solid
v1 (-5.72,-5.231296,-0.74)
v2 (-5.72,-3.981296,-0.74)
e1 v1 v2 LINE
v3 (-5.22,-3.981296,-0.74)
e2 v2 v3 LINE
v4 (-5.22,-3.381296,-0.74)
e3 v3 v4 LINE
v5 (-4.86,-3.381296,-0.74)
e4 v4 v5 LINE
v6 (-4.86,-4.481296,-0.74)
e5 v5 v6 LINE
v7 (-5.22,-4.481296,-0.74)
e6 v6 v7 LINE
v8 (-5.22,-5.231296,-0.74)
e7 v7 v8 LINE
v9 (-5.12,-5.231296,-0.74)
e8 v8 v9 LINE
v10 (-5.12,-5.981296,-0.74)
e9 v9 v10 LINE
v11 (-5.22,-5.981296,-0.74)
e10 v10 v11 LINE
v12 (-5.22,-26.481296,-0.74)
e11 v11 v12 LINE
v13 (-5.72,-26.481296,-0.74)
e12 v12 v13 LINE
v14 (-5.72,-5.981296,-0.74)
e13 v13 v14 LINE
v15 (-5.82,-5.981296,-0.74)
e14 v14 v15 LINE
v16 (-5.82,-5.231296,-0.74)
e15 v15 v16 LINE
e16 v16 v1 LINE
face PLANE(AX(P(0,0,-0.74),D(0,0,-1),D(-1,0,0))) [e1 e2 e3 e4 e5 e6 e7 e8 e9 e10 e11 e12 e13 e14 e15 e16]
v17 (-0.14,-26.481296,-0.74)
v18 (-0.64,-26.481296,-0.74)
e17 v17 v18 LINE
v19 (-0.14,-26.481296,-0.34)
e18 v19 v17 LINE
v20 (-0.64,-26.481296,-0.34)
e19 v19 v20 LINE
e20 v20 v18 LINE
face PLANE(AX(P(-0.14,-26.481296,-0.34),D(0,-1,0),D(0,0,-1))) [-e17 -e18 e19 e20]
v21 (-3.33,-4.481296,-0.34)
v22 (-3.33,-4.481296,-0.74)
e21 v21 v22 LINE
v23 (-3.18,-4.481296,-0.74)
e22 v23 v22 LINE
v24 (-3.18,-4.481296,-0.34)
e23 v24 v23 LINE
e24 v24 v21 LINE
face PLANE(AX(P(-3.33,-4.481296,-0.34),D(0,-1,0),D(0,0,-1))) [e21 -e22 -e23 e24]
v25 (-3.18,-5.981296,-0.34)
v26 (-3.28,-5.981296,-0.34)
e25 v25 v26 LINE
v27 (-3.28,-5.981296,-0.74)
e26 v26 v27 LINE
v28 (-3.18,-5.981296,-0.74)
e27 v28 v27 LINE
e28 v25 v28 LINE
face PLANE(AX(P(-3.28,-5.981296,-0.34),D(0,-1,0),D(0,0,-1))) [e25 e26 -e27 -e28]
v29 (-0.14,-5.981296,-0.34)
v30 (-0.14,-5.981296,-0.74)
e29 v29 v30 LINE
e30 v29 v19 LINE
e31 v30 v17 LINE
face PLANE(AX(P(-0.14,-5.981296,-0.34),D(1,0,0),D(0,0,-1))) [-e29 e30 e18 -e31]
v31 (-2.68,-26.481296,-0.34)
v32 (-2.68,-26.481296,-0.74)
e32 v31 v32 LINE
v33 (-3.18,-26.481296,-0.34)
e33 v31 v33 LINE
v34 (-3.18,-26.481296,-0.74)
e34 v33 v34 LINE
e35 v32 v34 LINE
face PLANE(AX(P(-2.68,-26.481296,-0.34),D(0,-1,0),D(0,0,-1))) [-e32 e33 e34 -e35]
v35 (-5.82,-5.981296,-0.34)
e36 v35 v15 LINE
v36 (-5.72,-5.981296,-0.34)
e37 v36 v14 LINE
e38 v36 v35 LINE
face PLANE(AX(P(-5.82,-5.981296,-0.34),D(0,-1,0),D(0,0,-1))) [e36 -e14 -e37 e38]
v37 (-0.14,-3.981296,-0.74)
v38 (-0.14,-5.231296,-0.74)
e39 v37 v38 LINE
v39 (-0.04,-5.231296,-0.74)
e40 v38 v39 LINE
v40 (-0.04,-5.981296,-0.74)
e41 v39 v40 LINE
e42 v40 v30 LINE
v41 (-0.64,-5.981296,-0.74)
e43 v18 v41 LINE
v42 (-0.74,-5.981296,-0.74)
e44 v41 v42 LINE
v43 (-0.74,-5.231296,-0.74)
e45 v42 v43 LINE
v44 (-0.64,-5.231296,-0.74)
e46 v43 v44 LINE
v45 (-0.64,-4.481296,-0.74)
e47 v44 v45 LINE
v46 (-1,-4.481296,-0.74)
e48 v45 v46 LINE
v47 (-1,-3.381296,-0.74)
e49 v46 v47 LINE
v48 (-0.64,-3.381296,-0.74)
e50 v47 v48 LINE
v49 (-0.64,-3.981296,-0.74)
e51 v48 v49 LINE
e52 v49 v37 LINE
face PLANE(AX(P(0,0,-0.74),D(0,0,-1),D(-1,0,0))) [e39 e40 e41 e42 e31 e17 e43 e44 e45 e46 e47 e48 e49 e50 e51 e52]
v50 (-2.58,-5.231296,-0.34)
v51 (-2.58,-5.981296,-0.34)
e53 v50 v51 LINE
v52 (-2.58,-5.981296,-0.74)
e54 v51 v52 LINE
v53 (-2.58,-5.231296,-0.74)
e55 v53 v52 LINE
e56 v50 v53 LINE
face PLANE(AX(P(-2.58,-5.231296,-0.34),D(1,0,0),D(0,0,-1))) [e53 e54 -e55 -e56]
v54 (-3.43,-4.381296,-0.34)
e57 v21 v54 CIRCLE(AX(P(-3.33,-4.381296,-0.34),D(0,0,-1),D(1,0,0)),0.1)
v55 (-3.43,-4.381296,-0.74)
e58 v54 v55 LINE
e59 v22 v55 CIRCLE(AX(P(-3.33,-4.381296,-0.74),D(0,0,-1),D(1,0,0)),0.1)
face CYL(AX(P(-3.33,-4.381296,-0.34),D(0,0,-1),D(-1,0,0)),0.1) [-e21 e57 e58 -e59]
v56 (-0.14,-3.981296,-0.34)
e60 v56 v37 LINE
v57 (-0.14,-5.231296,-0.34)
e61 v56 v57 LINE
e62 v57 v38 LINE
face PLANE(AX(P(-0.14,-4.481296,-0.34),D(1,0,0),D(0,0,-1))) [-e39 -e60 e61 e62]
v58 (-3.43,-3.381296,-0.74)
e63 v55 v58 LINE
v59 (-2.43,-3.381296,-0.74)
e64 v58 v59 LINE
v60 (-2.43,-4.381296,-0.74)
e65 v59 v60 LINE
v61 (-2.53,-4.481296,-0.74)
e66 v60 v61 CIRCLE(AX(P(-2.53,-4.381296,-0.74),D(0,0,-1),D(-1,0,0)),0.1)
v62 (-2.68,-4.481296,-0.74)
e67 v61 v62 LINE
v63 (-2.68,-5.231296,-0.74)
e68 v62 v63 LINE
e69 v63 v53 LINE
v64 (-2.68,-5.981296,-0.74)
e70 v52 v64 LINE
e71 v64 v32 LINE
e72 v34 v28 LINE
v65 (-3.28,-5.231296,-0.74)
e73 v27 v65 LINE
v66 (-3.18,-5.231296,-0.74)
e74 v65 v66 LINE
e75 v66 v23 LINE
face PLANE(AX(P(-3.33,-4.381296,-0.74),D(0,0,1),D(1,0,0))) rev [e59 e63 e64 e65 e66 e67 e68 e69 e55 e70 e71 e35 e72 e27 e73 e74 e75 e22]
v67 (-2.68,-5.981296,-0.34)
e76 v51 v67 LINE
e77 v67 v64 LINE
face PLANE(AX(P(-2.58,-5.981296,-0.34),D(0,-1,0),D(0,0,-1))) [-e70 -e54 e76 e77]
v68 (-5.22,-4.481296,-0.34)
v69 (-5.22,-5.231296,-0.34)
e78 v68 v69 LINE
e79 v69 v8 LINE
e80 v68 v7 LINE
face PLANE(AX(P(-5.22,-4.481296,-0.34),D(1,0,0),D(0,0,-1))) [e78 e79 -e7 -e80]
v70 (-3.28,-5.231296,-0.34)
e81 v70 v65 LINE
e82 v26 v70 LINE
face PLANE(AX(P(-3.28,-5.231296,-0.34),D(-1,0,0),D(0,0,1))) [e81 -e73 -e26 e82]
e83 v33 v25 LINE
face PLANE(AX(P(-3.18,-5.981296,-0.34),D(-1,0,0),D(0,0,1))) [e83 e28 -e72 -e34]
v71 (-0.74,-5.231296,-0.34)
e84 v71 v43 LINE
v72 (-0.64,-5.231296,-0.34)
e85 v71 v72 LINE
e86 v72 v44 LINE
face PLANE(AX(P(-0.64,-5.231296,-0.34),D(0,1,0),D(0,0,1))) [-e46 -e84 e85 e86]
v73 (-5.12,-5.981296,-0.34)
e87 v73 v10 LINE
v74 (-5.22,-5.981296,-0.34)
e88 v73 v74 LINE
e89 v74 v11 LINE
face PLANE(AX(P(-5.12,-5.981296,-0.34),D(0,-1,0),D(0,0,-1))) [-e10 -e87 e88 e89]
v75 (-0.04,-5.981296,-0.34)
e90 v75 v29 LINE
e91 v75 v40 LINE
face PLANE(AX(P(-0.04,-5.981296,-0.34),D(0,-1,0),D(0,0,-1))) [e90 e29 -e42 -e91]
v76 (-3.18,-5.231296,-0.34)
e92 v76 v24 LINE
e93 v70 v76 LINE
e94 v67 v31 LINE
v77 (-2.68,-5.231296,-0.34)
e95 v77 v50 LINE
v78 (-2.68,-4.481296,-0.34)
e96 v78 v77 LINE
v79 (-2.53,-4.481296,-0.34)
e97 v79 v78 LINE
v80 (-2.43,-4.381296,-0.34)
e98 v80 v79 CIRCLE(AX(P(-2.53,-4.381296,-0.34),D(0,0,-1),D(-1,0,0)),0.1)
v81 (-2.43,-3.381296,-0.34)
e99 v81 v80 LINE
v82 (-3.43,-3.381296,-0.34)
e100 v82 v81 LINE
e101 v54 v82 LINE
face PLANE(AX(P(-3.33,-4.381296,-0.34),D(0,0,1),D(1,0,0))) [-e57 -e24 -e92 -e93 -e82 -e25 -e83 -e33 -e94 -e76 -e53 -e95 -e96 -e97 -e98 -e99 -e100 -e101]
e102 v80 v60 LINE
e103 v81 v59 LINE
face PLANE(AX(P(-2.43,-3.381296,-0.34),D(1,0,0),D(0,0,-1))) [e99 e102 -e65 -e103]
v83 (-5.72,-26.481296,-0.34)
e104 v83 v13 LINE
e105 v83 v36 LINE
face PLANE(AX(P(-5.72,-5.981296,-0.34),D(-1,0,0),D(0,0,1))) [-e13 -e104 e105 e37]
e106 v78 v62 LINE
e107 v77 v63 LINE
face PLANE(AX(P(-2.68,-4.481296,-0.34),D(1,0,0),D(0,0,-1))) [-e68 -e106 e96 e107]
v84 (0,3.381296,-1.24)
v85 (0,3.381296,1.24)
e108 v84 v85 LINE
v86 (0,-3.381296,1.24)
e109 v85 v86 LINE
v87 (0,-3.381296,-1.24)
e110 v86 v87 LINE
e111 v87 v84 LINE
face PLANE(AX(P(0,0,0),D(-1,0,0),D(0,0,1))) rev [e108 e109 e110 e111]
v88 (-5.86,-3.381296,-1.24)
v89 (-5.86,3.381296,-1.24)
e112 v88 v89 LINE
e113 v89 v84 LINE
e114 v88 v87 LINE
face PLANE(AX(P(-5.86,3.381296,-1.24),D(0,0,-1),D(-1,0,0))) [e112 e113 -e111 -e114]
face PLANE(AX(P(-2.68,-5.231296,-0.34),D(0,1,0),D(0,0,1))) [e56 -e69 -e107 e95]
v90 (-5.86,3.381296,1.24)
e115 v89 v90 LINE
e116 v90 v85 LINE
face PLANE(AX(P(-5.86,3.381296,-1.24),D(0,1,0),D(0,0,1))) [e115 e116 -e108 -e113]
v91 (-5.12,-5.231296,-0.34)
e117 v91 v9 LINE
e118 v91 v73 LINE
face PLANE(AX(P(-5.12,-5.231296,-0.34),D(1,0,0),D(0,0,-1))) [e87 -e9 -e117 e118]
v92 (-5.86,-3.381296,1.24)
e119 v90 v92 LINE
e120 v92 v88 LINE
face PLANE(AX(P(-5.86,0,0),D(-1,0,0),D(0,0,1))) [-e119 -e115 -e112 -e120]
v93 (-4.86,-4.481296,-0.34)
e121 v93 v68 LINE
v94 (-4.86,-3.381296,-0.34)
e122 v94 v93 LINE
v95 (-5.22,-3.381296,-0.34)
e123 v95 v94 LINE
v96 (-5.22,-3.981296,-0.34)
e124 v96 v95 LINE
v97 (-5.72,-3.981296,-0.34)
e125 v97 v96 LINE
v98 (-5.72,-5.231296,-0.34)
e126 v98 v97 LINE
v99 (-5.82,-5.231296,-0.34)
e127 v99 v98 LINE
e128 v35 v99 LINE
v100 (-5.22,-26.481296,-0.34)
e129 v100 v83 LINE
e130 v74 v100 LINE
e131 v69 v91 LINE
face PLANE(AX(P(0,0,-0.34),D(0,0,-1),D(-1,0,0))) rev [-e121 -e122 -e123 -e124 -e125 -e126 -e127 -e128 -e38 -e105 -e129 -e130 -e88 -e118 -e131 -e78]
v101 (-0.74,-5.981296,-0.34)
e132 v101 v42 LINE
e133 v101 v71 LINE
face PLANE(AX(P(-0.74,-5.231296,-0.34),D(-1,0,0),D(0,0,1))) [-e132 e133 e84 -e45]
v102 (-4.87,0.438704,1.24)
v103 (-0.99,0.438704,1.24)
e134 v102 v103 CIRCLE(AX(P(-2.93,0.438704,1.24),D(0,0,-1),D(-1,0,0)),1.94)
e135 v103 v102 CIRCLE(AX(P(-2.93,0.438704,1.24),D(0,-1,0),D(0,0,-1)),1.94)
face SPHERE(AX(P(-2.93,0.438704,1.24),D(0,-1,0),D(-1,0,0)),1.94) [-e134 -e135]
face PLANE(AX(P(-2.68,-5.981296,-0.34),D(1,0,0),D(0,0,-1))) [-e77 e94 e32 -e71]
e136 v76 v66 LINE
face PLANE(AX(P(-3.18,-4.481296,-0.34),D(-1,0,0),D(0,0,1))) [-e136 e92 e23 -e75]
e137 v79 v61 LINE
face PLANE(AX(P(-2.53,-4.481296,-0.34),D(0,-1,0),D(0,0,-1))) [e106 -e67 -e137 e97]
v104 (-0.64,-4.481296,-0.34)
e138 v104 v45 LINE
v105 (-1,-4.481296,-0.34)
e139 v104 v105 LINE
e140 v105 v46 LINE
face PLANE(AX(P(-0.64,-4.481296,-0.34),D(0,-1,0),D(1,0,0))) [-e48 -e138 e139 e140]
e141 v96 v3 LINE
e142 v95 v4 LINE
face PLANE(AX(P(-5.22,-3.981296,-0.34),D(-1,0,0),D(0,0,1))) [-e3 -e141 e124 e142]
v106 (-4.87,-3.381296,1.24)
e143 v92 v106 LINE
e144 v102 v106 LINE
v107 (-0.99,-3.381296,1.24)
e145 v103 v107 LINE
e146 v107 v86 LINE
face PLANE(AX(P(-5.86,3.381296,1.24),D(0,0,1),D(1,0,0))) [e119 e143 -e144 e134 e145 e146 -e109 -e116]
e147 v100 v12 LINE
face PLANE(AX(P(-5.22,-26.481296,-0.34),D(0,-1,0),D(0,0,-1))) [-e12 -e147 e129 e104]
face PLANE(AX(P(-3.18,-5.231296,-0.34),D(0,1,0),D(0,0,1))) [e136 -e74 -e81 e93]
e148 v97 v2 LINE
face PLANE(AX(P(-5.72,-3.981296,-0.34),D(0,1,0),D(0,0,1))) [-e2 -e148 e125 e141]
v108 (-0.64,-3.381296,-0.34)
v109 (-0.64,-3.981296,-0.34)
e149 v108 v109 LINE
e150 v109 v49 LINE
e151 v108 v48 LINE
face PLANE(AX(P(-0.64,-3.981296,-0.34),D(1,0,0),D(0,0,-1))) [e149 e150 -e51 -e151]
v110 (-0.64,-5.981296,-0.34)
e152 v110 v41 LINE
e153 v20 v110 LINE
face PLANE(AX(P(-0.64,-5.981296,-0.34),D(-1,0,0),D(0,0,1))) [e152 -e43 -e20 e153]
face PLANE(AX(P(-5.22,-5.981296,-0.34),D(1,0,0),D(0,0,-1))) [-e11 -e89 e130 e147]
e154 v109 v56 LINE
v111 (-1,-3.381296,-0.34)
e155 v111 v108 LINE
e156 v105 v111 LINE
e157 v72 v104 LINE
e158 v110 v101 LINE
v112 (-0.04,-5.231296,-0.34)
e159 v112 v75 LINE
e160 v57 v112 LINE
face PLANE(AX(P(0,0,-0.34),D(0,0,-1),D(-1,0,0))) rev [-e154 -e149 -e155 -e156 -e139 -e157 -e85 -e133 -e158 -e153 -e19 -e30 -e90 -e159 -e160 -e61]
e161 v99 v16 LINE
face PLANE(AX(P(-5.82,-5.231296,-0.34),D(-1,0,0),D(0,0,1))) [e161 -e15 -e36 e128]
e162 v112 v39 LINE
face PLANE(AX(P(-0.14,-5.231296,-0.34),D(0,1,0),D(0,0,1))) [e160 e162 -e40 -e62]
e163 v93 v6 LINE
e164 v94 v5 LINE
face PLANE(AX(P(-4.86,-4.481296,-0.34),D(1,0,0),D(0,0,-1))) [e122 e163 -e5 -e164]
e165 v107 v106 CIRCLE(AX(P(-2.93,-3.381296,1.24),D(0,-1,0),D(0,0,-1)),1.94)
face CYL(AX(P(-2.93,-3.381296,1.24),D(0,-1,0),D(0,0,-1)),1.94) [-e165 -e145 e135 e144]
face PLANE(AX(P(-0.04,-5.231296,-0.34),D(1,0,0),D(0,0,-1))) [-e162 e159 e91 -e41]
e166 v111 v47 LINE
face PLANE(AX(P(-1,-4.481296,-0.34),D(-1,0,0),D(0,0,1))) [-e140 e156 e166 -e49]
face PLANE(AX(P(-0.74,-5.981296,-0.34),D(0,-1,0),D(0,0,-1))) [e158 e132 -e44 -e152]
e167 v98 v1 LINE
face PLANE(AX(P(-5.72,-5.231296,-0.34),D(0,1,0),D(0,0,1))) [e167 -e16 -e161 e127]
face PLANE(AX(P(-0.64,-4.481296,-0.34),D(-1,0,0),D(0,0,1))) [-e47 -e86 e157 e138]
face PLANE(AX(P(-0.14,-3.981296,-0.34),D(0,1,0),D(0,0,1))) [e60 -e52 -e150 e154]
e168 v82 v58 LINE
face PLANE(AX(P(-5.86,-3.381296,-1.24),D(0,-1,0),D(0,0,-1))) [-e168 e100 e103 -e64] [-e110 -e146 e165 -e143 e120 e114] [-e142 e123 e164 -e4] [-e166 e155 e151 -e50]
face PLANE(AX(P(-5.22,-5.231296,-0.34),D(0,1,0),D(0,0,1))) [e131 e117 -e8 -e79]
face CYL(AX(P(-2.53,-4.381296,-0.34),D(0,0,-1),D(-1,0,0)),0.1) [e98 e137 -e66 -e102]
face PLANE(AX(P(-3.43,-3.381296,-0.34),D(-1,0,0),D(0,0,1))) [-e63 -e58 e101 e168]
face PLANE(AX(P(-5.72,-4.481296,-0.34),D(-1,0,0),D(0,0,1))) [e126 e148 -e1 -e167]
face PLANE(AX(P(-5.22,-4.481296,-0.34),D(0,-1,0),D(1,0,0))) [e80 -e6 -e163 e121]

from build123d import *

# Parameters (mm, degrees)
IZIM2_W                     = 2.48
IZIM2_H                     = 6.762592592
Y_KSEKLIK_EKSTR_ZYON2_DEPTH = 5.86
Y_KSEKLIK_EKSTR_ZYON3_DEPTH = 0.4


# Read off the part's stored shape, not the designer's step: Döndür1
with BuildPart() as part:
    # Çizim2 → Yükseklik-Ekstrüzyon2 (new body)
    with BuildSketch(Plane(origin=(0, 0, 0), x_dir=(0, 0, -1), z_dir=(1, 0, 0))):
        Rectangle(IZIM2_W, IZIM2_H)
    extrude(amount=-Y_KSEKLIK_EKSTR_ZYON2_DEPTH)

    # Döndür1 outline → Döndür1 (revolve)
    with BuildSketch(Plane(origin=(-2.93, 0, 1.24), x_dir=(1, 0, 0), z_dir=(0, 0, 1))):
        with BuildLine():
            Line((0, 2.378703704), (0, -3.381296296))
            Line((0, -3.381296296), (1.94, -3.381296296))
            Line((1.94, -3.381296296), (1.94, 0.438703704))
            ThreePointArc((1.94, 0.438703704), (1.371787155, 1.810490859), (0, 2.378703704))
        make_face()
    revolve(axis=Axis((-2.93, 0, 1.24), (0, 1, 0)))

    # Çizim6 → Yükseklik-Ekstrüzyon3 (add)
    with BuildSketch(Plane(origin=(0, 0, -0.74), x_dir=(-1, 0, 0), z_dir=(0, 0, -1))):
        with BuildLine():
            Line((2.43, -3.381296296), (2.43, -4.381296296))
            ThreePointArc((2.43, -4.381296296), (2.459289322, -4.452006974), (2.53, -4.481296296))
            Line((2.53, -4.481296296), (2.68, -4.481296296))
            Line((2.68, -4.481296296), (2.68, -5.231296296))
            Line((2.68, -5.231296296), (2.58, -5.231296296))
            Line((2.58, -5.231296296), (2.58, -5.981296296))
            Line((2.58, -5.981296296), (2.68, -5.981296296))
            Line((2.68, -5.981296296), (2.68, -26.481296296))
            Line((2.68, -26.481296296), (3.18, -26.481296296))
            Line((3.18, -26.481296296), (3.18, -5.981296296))
            Line((3.18, -5.981296296), (3.28, -5.981296296))
            Line((3.28, -5.981296296), (3.28, -5.231296296))
            Line((3.28, -5.231296296), (3.18, -5.231296296))
            Line((3.18, -5.231296296), (3.18, -4.481296296))
            Line((3.18, -4.481296296), (3.33, -4.481296296))
            ThreePointArc((3.33, -4.481296296), (3.400710678, -4.452006974), (3.43, -4.381296296))
            Line((3.43, -4.381296296), (3.43, -3.381296296))
            Line((3.43, -3.381296296), (2.43, -3.381296296))
        make_face()
        Polygon((5.22, -4.481296296), (5.22, -5.231296296), (5.12, -5.231296296), (5.12, -5.981296296), (5.22, -5.981296296), (5.22, -26.481296296), (5.72, -26.481296296), (5.72, -5.981296296), (5.82, -5.981296296), (5.82, -5.231296296), (5.72, -5.231296296), (5.72, -4.481296296), (5.72, -3.981296296), (5.22, -3.981296296), (5.22, -3.381296296), (4.86, -3.381296296), (4.86, -4.481296296), align=None)
        Polygon((0.14, -4.481296296), (0.14, -5.231296296), (0.04, -5.231296296), (0.04, -5.981296296), (0.14, -5.981296296), (0.14, -26.481296296), (0.64, -26.481296296), (0.64, -5.981296296), (0.74, -5.981296296), (0.74, -5.231296296), (0.64, -5.231296296), (0.64, -4.481296296), (1, -4.481296296), (1, -3.381296296), (0.64, -3.381296296), (0.64, -3.981296296), (0.14, -3.981296296), align=None)
    extrude(amount=-Y_KSEKLIK_EKSTR_ZYON3_DEPTH)


solid = part.part
